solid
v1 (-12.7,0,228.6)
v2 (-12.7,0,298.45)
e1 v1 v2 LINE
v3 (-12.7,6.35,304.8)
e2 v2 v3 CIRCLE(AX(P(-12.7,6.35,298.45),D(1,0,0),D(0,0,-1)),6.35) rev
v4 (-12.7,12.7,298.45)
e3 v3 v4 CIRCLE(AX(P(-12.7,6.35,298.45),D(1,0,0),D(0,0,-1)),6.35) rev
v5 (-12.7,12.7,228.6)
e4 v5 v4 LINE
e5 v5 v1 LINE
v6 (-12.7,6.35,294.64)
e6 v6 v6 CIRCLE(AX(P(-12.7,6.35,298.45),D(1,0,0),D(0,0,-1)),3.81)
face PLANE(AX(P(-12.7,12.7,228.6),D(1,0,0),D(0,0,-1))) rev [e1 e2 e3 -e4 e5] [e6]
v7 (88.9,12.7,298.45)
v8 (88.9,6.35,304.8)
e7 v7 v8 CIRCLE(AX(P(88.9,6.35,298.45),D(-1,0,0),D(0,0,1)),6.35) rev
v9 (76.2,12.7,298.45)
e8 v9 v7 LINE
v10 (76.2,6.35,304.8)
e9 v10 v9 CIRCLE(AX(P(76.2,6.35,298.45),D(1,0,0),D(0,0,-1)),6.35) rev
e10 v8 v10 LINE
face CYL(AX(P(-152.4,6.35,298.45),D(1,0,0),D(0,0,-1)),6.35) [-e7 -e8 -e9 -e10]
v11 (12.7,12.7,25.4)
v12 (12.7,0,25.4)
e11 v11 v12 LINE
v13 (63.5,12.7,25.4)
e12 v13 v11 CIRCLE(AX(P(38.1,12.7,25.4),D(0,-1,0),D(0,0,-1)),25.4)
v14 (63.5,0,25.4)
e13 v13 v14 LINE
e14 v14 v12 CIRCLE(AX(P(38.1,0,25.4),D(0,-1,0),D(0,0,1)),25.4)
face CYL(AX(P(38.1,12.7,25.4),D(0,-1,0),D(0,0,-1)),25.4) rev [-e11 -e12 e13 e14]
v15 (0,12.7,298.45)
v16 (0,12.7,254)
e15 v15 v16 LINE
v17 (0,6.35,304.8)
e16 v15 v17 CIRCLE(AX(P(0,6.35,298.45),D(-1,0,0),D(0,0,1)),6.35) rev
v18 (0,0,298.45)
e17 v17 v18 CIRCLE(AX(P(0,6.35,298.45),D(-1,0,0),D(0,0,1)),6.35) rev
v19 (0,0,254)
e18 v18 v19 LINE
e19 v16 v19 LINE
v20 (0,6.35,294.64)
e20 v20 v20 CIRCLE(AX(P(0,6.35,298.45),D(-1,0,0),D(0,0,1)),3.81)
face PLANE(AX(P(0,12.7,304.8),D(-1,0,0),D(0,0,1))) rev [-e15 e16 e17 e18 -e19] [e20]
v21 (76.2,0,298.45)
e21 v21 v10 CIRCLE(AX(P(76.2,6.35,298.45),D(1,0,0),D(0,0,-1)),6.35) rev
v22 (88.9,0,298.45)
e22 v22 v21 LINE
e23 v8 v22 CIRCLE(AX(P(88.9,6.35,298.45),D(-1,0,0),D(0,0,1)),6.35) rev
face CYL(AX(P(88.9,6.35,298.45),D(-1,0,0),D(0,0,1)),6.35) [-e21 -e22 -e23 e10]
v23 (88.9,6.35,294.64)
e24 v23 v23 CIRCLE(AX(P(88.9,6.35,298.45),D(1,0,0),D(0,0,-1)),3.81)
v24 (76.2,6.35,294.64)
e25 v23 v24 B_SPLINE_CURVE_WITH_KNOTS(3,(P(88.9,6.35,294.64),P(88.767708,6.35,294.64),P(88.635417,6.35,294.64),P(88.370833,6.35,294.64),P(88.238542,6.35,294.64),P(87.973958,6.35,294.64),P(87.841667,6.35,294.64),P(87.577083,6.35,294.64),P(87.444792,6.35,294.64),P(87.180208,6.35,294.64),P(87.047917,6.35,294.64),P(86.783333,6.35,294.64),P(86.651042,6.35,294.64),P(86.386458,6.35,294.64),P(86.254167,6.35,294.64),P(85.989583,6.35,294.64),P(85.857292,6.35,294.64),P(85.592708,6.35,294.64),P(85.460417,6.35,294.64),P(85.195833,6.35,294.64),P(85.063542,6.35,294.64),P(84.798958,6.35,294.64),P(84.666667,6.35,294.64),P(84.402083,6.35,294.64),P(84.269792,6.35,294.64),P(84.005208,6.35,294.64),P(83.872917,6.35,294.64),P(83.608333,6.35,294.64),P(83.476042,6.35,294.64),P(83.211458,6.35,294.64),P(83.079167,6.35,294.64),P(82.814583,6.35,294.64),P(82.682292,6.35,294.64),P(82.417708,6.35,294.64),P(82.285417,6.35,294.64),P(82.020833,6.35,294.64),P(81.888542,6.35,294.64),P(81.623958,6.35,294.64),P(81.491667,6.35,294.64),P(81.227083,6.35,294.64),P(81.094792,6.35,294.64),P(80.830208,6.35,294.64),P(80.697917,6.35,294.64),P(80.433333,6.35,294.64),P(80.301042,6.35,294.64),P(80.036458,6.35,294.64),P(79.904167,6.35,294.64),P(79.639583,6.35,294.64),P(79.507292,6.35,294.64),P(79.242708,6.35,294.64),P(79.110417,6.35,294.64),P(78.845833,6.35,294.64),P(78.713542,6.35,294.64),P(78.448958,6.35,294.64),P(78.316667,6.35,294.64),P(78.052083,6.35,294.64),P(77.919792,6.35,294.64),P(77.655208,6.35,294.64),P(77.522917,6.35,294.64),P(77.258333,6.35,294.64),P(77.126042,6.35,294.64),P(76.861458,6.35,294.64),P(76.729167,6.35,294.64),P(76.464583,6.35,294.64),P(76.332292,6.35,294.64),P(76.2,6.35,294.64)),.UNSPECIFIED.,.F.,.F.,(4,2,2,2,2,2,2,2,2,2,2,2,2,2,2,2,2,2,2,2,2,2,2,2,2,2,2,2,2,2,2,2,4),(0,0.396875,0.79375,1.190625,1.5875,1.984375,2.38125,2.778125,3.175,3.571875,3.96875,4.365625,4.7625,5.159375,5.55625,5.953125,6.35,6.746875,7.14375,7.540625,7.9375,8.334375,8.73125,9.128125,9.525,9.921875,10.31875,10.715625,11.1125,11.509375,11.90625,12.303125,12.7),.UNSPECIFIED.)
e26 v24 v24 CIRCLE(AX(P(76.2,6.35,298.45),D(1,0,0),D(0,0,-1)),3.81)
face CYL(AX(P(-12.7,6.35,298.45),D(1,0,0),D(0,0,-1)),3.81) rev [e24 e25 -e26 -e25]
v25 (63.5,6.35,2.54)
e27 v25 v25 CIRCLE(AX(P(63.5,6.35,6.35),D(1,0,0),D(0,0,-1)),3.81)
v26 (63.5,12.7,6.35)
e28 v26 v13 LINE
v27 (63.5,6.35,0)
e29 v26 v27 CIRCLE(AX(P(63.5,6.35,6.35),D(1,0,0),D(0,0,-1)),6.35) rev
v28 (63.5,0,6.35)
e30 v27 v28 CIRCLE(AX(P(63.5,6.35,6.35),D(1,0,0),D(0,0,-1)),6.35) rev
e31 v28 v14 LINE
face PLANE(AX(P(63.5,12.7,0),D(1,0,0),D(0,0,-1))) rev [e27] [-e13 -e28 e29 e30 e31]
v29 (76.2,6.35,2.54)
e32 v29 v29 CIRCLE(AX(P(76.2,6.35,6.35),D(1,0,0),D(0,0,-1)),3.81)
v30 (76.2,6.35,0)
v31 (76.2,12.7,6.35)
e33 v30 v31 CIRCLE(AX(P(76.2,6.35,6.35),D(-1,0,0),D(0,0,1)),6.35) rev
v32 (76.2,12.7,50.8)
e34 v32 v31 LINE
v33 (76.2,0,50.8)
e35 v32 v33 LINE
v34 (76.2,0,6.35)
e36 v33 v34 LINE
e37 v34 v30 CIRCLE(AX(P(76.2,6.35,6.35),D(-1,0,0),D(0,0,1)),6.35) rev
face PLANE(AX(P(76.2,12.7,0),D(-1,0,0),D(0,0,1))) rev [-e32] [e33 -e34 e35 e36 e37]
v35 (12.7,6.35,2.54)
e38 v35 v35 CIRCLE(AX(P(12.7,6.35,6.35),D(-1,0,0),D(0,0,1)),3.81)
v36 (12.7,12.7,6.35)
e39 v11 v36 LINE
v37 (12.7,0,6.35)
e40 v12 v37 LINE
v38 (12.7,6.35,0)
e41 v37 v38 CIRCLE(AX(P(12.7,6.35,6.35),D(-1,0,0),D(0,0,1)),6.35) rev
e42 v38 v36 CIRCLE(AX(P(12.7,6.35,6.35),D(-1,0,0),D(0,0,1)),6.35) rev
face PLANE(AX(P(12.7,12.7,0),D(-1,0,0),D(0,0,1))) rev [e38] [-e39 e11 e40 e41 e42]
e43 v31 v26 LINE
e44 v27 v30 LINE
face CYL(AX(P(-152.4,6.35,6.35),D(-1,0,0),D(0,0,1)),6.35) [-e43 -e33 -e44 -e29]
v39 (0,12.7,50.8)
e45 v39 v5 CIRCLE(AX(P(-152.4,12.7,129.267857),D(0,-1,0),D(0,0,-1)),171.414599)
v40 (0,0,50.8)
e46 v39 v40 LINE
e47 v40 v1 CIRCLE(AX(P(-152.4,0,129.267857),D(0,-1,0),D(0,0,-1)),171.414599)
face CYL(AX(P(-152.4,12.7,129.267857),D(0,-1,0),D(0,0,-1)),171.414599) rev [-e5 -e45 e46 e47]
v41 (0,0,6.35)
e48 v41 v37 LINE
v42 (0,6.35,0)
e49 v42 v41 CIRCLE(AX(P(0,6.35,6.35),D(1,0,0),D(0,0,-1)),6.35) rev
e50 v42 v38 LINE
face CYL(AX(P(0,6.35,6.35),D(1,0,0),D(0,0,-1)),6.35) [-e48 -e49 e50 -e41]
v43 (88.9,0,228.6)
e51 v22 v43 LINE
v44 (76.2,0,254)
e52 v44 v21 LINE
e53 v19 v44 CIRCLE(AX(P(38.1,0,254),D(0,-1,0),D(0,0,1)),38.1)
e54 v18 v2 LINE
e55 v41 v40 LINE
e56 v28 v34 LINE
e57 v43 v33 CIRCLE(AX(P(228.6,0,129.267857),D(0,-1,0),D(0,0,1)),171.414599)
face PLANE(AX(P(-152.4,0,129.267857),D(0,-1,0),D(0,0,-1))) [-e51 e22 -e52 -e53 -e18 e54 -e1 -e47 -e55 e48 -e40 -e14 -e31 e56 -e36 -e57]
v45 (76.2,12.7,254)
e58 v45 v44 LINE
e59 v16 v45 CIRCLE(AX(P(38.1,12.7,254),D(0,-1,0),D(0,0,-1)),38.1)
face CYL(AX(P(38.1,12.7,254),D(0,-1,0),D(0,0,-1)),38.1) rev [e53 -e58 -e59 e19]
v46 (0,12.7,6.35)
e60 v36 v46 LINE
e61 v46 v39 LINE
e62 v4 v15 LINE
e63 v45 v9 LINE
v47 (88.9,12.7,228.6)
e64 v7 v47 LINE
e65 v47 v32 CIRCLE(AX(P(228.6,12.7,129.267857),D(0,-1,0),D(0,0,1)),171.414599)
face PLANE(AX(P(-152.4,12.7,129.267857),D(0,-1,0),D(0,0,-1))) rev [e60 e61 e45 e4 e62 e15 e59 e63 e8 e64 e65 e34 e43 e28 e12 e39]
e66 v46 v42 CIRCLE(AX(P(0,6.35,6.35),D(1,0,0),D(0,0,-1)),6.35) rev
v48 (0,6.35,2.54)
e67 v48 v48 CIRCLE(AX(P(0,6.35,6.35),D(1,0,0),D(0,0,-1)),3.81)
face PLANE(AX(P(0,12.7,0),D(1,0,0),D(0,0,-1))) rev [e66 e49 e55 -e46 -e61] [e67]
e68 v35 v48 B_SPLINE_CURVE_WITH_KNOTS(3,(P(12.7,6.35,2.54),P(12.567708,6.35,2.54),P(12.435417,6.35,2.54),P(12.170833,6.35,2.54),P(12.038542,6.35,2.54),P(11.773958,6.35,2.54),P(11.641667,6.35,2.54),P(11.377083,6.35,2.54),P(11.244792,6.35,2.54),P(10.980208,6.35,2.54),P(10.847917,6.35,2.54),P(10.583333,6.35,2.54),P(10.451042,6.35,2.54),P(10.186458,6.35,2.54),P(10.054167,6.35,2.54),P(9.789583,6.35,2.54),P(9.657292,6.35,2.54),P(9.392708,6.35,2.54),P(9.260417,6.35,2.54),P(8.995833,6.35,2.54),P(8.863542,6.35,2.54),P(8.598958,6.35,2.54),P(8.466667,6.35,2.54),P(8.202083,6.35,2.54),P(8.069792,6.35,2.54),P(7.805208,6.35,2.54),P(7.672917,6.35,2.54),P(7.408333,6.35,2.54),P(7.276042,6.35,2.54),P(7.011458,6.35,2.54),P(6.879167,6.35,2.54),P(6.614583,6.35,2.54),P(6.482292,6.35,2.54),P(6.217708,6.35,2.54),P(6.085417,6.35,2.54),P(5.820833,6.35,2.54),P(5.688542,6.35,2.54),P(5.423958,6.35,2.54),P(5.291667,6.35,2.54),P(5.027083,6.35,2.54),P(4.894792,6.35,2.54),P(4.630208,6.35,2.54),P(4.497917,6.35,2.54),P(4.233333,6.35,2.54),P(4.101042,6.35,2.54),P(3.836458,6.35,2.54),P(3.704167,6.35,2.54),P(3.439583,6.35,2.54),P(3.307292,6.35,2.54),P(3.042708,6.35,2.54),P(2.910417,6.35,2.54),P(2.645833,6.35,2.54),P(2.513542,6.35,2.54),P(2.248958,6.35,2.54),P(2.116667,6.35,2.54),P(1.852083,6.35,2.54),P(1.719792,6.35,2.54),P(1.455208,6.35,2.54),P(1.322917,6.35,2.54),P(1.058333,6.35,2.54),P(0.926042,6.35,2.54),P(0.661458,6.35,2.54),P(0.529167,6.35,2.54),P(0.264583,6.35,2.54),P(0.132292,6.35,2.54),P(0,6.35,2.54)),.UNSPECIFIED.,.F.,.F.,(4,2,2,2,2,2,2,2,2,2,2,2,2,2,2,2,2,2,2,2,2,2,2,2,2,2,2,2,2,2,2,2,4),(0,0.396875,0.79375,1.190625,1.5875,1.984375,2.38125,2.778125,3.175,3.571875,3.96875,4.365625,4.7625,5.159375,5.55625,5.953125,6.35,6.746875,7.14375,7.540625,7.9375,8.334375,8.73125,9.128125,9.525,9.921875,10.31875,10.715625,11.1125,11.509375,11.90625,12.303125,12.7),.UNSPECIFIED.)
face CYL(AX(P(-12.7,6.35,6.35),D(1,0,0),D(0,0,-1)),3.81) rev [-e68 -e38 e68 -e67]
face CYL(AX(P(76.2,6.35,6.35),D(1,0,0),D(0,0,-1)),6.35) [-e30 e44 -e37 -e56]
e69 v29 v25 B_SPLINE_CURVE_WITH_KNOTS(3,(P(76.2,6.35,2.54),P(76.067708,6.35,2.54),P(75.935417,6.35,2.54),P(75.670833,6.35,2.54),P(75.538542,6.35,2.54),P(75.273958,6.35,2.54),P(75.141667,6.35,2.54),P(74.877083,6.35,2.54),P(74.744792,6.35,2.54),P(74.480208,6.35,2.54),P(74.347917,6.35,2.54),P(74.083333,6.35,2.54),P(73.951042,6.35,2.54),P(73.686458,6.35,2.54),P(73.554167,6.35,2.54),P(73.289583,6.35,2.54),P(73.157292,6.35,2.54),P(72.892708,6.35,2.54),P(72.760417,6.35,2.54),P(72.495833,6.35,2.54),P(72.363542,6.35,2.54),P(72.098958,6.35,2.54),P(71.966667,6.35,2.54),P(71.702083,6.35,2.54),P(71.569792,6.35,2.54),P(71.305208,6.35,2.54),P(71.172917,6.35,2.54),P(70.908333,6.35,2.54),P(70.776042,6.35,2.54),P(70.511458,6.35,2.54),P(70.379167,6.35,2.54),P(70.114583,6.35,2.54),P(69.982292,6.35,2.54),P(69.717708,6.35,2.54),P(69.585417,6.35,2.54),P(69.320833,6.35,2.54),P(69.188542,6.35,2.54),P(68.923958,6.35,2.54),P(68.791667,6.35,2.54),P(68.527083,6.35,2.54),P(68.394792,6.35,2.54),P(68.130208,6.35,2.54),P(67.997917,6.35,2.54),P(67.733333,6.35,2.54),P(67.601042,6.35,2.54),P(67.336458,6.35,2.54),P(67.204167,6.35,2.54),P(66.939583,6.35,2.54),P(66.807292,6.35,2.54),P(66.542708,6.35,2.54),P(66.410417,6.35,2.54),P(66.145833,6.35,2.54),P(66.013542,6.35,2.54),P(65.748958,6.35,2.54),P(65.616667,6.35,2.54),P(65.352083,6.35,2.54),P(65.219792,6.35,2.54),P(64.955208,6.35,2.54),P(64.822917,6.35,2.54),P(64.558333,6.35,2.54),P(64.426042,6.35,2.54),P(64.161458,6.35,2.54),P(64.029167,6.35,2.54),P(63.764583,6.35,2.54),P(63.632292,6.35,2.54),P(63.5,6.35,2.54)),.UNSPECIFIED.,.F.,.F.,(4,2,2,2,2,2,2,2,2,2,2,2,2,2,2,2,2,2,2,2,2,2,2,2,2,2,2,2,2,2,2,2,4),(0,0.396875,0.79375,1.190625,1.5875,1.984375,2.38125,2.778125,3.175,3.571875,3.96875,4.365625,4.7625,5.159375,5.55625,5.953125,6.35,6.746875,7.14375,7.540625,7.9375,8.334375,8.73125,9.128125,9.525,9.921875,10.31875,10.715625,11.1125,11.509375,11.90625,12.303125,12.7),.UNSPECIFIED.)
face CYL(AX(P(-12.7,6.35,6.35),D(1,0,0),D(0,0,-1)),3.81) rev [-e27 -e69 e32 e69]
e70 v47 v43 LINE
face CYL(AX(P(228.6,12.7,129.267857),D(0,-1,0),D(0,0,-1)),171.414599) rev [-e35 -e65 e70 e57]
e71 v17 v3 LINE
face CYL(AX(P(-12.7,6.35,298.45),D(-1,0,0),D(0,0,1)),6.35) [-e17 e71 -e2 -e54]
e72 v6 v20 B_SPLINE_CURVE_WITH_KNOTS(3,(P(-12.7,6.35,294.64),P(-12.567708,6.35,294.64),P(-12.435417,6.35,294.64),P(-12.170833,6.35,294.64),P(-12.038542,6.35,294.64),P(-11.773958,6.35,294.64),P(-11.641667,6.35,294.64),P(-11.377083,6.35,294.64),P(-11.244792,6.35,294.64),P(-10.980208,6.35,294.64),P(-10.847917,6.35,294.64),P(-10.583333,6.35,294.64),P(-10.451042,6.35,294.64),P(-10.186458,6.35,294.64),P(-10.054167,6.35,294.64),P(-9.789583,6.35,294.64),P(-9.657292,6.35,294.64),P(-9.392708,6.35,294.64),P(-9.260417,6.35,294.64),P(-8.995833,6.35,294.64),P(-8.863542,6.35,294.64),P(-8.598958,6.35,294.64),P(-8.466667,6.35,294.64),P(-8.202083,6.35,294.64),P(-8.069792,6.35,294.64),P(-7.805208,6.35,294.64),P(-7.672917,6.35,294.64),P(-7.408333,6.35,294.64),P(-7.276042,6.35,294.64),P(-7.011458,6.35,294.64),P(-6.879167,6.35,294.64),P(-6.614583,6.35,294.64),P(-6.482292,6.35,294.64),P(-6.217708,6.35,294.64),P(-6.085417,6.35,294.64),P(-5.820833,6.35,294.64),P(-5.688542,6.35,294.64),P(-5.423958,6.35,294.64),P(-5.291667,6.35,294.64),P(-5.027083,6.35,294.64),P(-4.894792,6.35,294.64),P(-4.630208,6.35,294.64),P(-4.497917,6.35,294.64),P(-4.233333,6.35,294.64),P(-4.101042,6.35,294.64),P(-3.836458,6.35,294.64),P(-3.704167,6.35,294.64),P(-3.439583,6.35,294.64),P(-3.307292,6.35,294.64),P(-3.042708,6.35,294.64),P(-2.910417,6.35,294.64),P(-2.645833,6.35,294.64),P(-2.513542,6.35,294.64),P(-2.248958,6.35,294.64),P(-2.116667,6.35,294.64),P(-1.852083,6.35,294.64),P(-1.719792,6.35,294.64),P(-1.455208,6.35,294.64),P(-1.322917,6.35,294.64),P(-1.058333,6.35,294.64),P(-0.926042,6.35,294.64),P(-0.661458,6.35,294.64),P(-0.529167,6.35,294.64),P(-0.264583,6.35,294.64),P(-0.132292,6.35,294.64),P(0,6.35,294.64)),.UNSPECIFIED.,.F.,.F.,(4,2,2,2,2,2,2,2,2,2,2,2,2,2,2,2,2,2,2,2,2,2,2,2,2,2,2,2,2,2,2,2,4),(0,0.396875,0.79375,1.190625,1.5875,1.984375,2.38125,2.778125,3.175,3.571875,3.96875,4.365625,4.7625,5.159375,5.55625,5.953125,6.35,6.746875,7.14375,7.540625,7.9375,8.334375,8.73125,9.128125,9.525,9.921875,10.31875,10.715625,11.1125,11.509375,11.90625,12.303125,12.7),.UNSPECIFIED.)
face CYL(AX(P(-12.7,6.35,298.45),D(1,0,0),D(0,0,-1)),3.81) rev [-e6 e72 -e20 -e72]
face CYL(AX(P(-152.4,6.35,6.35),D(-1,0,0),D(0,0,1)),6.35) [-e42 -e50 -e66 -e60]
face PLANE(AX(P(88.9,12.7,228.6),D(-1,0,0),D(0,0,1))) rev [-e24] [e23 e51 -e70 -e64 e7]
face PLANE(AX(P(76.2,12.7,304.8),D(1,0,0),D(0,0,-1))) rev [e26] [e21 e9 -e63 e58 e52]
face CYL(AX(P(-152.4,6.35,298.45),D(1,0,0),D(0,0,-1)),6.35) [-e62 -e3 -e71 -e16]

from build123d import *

# Parameters (mm, degrees)
BOSS_EXTRUDE1_DEPTH = 12.7
FILLET1_R           = 6.35
SKETCH2_R           = 3.81
CUT_EXTRUDE1_DEPTH  = 322.53831809
SKETCH3_R           = 3.81
CUT_EXTRUDE2_DEPTH  = 318.753898481


with BuildPart() as part:
    # Sketch1 → Boss-Extrude1 (new body)
    with BuildSketch(Plane(origin=(0, 0, 0), x_dir=(1, 0, 0), z_dir=(0, 1, 0))):
        with BuildLine():
            Line((0, 0), (12.7, 0))
            Line((12.7, 0), (12.7, -25.4))
            ThreePointArc((12.7, -25.4), (20.139487758, -43.360512242), (38.1, -50.8))
            ThreePointArc((38.1, -50.8), (56.060512242, -43.360512242), (63.5, -25.4))
            Line((63.5, -25.4), (63.5, 0))
            Line((63.5, 0), (76.2, 0))
            Line((76.2, 0), (76.2, -50.8))
            ThreePointArc((76.2, -50.8), (57.621017373, -141.480641616), (88.9, -228.6))
            Line((88.9, -228.6), (88.9, -304.8))
            Line((88.9, -304.8), (76.2, -304.8))
            Line((76.2, -304.8), (76.2, -254))
            ThreePointArc((76.2, -254), (65.040768363, -227.059231637), (38.1, -215.9))
            ThreePointArc((38.1, -215.9), (11.159231637, -227.059231637), (0, -254))
            Line((0, -254), (0, -304.8))
            Line((0, -304.8), (-12.7, -304.8))
            Line((-12.7, -304.8), (-12.7, -228.6))
            ThreePointArc((-12.7, -228.6), (18.578982627, -141.480641616), (0, -50.8))
            Line((0, -50.8), (0, 0))
        make_face()
    extrude(amount=BOSS_EXTRUDE1_DEPTH)

    # Fillet1
    fillet1_edges = [part.edges().sort_by_distance(p)[0] for p in [
        (69.85, 0, 0),
        (6.35, 0, 0),
        (69.85, 12.7, 0),
        (6.35, 12.7, 0),
        (-6.35, 0, 304.8),
        (-6.35, 12.7, 304.8),
        (82.55, 0, 304.8),
        (82.55, 12.7, 304.8),
    ]]
    fillet(fillet1_edges, radius=FILLET1_R - 0.0001)  # a hair under: the kernel refuses the full size

    # Sketch2 → Cut-Extrude1 (cut, through all)
    with BuildSketch(Plane(origin=(88.9, 0, 0), x_dir=(0, 0, -1), z_dir=(1, 0, 0))):
        with Locations((-298.45, 6.35)):
            Circle(SKETCH2_R)
    extrude(amount=-CUT_EXTRUDE1_DEPTH, mode=Mode.SUBTRACT)

    # Sketch3 → Cut-Extrude2 (cut, through all)
    with BuildSketch(Plane(origin=(76.2, 0, 0), x_dir=(0, 0, -1), z_dir=(1, 0, 0))):
        with Locations((-6.35, 6.35)):
            Circle(SKETCH3_R)
    extrude(amount=-CUT_EXTRUDE2_DEPTH, mode=Mode.SUBTRACT)


solid = part.part
